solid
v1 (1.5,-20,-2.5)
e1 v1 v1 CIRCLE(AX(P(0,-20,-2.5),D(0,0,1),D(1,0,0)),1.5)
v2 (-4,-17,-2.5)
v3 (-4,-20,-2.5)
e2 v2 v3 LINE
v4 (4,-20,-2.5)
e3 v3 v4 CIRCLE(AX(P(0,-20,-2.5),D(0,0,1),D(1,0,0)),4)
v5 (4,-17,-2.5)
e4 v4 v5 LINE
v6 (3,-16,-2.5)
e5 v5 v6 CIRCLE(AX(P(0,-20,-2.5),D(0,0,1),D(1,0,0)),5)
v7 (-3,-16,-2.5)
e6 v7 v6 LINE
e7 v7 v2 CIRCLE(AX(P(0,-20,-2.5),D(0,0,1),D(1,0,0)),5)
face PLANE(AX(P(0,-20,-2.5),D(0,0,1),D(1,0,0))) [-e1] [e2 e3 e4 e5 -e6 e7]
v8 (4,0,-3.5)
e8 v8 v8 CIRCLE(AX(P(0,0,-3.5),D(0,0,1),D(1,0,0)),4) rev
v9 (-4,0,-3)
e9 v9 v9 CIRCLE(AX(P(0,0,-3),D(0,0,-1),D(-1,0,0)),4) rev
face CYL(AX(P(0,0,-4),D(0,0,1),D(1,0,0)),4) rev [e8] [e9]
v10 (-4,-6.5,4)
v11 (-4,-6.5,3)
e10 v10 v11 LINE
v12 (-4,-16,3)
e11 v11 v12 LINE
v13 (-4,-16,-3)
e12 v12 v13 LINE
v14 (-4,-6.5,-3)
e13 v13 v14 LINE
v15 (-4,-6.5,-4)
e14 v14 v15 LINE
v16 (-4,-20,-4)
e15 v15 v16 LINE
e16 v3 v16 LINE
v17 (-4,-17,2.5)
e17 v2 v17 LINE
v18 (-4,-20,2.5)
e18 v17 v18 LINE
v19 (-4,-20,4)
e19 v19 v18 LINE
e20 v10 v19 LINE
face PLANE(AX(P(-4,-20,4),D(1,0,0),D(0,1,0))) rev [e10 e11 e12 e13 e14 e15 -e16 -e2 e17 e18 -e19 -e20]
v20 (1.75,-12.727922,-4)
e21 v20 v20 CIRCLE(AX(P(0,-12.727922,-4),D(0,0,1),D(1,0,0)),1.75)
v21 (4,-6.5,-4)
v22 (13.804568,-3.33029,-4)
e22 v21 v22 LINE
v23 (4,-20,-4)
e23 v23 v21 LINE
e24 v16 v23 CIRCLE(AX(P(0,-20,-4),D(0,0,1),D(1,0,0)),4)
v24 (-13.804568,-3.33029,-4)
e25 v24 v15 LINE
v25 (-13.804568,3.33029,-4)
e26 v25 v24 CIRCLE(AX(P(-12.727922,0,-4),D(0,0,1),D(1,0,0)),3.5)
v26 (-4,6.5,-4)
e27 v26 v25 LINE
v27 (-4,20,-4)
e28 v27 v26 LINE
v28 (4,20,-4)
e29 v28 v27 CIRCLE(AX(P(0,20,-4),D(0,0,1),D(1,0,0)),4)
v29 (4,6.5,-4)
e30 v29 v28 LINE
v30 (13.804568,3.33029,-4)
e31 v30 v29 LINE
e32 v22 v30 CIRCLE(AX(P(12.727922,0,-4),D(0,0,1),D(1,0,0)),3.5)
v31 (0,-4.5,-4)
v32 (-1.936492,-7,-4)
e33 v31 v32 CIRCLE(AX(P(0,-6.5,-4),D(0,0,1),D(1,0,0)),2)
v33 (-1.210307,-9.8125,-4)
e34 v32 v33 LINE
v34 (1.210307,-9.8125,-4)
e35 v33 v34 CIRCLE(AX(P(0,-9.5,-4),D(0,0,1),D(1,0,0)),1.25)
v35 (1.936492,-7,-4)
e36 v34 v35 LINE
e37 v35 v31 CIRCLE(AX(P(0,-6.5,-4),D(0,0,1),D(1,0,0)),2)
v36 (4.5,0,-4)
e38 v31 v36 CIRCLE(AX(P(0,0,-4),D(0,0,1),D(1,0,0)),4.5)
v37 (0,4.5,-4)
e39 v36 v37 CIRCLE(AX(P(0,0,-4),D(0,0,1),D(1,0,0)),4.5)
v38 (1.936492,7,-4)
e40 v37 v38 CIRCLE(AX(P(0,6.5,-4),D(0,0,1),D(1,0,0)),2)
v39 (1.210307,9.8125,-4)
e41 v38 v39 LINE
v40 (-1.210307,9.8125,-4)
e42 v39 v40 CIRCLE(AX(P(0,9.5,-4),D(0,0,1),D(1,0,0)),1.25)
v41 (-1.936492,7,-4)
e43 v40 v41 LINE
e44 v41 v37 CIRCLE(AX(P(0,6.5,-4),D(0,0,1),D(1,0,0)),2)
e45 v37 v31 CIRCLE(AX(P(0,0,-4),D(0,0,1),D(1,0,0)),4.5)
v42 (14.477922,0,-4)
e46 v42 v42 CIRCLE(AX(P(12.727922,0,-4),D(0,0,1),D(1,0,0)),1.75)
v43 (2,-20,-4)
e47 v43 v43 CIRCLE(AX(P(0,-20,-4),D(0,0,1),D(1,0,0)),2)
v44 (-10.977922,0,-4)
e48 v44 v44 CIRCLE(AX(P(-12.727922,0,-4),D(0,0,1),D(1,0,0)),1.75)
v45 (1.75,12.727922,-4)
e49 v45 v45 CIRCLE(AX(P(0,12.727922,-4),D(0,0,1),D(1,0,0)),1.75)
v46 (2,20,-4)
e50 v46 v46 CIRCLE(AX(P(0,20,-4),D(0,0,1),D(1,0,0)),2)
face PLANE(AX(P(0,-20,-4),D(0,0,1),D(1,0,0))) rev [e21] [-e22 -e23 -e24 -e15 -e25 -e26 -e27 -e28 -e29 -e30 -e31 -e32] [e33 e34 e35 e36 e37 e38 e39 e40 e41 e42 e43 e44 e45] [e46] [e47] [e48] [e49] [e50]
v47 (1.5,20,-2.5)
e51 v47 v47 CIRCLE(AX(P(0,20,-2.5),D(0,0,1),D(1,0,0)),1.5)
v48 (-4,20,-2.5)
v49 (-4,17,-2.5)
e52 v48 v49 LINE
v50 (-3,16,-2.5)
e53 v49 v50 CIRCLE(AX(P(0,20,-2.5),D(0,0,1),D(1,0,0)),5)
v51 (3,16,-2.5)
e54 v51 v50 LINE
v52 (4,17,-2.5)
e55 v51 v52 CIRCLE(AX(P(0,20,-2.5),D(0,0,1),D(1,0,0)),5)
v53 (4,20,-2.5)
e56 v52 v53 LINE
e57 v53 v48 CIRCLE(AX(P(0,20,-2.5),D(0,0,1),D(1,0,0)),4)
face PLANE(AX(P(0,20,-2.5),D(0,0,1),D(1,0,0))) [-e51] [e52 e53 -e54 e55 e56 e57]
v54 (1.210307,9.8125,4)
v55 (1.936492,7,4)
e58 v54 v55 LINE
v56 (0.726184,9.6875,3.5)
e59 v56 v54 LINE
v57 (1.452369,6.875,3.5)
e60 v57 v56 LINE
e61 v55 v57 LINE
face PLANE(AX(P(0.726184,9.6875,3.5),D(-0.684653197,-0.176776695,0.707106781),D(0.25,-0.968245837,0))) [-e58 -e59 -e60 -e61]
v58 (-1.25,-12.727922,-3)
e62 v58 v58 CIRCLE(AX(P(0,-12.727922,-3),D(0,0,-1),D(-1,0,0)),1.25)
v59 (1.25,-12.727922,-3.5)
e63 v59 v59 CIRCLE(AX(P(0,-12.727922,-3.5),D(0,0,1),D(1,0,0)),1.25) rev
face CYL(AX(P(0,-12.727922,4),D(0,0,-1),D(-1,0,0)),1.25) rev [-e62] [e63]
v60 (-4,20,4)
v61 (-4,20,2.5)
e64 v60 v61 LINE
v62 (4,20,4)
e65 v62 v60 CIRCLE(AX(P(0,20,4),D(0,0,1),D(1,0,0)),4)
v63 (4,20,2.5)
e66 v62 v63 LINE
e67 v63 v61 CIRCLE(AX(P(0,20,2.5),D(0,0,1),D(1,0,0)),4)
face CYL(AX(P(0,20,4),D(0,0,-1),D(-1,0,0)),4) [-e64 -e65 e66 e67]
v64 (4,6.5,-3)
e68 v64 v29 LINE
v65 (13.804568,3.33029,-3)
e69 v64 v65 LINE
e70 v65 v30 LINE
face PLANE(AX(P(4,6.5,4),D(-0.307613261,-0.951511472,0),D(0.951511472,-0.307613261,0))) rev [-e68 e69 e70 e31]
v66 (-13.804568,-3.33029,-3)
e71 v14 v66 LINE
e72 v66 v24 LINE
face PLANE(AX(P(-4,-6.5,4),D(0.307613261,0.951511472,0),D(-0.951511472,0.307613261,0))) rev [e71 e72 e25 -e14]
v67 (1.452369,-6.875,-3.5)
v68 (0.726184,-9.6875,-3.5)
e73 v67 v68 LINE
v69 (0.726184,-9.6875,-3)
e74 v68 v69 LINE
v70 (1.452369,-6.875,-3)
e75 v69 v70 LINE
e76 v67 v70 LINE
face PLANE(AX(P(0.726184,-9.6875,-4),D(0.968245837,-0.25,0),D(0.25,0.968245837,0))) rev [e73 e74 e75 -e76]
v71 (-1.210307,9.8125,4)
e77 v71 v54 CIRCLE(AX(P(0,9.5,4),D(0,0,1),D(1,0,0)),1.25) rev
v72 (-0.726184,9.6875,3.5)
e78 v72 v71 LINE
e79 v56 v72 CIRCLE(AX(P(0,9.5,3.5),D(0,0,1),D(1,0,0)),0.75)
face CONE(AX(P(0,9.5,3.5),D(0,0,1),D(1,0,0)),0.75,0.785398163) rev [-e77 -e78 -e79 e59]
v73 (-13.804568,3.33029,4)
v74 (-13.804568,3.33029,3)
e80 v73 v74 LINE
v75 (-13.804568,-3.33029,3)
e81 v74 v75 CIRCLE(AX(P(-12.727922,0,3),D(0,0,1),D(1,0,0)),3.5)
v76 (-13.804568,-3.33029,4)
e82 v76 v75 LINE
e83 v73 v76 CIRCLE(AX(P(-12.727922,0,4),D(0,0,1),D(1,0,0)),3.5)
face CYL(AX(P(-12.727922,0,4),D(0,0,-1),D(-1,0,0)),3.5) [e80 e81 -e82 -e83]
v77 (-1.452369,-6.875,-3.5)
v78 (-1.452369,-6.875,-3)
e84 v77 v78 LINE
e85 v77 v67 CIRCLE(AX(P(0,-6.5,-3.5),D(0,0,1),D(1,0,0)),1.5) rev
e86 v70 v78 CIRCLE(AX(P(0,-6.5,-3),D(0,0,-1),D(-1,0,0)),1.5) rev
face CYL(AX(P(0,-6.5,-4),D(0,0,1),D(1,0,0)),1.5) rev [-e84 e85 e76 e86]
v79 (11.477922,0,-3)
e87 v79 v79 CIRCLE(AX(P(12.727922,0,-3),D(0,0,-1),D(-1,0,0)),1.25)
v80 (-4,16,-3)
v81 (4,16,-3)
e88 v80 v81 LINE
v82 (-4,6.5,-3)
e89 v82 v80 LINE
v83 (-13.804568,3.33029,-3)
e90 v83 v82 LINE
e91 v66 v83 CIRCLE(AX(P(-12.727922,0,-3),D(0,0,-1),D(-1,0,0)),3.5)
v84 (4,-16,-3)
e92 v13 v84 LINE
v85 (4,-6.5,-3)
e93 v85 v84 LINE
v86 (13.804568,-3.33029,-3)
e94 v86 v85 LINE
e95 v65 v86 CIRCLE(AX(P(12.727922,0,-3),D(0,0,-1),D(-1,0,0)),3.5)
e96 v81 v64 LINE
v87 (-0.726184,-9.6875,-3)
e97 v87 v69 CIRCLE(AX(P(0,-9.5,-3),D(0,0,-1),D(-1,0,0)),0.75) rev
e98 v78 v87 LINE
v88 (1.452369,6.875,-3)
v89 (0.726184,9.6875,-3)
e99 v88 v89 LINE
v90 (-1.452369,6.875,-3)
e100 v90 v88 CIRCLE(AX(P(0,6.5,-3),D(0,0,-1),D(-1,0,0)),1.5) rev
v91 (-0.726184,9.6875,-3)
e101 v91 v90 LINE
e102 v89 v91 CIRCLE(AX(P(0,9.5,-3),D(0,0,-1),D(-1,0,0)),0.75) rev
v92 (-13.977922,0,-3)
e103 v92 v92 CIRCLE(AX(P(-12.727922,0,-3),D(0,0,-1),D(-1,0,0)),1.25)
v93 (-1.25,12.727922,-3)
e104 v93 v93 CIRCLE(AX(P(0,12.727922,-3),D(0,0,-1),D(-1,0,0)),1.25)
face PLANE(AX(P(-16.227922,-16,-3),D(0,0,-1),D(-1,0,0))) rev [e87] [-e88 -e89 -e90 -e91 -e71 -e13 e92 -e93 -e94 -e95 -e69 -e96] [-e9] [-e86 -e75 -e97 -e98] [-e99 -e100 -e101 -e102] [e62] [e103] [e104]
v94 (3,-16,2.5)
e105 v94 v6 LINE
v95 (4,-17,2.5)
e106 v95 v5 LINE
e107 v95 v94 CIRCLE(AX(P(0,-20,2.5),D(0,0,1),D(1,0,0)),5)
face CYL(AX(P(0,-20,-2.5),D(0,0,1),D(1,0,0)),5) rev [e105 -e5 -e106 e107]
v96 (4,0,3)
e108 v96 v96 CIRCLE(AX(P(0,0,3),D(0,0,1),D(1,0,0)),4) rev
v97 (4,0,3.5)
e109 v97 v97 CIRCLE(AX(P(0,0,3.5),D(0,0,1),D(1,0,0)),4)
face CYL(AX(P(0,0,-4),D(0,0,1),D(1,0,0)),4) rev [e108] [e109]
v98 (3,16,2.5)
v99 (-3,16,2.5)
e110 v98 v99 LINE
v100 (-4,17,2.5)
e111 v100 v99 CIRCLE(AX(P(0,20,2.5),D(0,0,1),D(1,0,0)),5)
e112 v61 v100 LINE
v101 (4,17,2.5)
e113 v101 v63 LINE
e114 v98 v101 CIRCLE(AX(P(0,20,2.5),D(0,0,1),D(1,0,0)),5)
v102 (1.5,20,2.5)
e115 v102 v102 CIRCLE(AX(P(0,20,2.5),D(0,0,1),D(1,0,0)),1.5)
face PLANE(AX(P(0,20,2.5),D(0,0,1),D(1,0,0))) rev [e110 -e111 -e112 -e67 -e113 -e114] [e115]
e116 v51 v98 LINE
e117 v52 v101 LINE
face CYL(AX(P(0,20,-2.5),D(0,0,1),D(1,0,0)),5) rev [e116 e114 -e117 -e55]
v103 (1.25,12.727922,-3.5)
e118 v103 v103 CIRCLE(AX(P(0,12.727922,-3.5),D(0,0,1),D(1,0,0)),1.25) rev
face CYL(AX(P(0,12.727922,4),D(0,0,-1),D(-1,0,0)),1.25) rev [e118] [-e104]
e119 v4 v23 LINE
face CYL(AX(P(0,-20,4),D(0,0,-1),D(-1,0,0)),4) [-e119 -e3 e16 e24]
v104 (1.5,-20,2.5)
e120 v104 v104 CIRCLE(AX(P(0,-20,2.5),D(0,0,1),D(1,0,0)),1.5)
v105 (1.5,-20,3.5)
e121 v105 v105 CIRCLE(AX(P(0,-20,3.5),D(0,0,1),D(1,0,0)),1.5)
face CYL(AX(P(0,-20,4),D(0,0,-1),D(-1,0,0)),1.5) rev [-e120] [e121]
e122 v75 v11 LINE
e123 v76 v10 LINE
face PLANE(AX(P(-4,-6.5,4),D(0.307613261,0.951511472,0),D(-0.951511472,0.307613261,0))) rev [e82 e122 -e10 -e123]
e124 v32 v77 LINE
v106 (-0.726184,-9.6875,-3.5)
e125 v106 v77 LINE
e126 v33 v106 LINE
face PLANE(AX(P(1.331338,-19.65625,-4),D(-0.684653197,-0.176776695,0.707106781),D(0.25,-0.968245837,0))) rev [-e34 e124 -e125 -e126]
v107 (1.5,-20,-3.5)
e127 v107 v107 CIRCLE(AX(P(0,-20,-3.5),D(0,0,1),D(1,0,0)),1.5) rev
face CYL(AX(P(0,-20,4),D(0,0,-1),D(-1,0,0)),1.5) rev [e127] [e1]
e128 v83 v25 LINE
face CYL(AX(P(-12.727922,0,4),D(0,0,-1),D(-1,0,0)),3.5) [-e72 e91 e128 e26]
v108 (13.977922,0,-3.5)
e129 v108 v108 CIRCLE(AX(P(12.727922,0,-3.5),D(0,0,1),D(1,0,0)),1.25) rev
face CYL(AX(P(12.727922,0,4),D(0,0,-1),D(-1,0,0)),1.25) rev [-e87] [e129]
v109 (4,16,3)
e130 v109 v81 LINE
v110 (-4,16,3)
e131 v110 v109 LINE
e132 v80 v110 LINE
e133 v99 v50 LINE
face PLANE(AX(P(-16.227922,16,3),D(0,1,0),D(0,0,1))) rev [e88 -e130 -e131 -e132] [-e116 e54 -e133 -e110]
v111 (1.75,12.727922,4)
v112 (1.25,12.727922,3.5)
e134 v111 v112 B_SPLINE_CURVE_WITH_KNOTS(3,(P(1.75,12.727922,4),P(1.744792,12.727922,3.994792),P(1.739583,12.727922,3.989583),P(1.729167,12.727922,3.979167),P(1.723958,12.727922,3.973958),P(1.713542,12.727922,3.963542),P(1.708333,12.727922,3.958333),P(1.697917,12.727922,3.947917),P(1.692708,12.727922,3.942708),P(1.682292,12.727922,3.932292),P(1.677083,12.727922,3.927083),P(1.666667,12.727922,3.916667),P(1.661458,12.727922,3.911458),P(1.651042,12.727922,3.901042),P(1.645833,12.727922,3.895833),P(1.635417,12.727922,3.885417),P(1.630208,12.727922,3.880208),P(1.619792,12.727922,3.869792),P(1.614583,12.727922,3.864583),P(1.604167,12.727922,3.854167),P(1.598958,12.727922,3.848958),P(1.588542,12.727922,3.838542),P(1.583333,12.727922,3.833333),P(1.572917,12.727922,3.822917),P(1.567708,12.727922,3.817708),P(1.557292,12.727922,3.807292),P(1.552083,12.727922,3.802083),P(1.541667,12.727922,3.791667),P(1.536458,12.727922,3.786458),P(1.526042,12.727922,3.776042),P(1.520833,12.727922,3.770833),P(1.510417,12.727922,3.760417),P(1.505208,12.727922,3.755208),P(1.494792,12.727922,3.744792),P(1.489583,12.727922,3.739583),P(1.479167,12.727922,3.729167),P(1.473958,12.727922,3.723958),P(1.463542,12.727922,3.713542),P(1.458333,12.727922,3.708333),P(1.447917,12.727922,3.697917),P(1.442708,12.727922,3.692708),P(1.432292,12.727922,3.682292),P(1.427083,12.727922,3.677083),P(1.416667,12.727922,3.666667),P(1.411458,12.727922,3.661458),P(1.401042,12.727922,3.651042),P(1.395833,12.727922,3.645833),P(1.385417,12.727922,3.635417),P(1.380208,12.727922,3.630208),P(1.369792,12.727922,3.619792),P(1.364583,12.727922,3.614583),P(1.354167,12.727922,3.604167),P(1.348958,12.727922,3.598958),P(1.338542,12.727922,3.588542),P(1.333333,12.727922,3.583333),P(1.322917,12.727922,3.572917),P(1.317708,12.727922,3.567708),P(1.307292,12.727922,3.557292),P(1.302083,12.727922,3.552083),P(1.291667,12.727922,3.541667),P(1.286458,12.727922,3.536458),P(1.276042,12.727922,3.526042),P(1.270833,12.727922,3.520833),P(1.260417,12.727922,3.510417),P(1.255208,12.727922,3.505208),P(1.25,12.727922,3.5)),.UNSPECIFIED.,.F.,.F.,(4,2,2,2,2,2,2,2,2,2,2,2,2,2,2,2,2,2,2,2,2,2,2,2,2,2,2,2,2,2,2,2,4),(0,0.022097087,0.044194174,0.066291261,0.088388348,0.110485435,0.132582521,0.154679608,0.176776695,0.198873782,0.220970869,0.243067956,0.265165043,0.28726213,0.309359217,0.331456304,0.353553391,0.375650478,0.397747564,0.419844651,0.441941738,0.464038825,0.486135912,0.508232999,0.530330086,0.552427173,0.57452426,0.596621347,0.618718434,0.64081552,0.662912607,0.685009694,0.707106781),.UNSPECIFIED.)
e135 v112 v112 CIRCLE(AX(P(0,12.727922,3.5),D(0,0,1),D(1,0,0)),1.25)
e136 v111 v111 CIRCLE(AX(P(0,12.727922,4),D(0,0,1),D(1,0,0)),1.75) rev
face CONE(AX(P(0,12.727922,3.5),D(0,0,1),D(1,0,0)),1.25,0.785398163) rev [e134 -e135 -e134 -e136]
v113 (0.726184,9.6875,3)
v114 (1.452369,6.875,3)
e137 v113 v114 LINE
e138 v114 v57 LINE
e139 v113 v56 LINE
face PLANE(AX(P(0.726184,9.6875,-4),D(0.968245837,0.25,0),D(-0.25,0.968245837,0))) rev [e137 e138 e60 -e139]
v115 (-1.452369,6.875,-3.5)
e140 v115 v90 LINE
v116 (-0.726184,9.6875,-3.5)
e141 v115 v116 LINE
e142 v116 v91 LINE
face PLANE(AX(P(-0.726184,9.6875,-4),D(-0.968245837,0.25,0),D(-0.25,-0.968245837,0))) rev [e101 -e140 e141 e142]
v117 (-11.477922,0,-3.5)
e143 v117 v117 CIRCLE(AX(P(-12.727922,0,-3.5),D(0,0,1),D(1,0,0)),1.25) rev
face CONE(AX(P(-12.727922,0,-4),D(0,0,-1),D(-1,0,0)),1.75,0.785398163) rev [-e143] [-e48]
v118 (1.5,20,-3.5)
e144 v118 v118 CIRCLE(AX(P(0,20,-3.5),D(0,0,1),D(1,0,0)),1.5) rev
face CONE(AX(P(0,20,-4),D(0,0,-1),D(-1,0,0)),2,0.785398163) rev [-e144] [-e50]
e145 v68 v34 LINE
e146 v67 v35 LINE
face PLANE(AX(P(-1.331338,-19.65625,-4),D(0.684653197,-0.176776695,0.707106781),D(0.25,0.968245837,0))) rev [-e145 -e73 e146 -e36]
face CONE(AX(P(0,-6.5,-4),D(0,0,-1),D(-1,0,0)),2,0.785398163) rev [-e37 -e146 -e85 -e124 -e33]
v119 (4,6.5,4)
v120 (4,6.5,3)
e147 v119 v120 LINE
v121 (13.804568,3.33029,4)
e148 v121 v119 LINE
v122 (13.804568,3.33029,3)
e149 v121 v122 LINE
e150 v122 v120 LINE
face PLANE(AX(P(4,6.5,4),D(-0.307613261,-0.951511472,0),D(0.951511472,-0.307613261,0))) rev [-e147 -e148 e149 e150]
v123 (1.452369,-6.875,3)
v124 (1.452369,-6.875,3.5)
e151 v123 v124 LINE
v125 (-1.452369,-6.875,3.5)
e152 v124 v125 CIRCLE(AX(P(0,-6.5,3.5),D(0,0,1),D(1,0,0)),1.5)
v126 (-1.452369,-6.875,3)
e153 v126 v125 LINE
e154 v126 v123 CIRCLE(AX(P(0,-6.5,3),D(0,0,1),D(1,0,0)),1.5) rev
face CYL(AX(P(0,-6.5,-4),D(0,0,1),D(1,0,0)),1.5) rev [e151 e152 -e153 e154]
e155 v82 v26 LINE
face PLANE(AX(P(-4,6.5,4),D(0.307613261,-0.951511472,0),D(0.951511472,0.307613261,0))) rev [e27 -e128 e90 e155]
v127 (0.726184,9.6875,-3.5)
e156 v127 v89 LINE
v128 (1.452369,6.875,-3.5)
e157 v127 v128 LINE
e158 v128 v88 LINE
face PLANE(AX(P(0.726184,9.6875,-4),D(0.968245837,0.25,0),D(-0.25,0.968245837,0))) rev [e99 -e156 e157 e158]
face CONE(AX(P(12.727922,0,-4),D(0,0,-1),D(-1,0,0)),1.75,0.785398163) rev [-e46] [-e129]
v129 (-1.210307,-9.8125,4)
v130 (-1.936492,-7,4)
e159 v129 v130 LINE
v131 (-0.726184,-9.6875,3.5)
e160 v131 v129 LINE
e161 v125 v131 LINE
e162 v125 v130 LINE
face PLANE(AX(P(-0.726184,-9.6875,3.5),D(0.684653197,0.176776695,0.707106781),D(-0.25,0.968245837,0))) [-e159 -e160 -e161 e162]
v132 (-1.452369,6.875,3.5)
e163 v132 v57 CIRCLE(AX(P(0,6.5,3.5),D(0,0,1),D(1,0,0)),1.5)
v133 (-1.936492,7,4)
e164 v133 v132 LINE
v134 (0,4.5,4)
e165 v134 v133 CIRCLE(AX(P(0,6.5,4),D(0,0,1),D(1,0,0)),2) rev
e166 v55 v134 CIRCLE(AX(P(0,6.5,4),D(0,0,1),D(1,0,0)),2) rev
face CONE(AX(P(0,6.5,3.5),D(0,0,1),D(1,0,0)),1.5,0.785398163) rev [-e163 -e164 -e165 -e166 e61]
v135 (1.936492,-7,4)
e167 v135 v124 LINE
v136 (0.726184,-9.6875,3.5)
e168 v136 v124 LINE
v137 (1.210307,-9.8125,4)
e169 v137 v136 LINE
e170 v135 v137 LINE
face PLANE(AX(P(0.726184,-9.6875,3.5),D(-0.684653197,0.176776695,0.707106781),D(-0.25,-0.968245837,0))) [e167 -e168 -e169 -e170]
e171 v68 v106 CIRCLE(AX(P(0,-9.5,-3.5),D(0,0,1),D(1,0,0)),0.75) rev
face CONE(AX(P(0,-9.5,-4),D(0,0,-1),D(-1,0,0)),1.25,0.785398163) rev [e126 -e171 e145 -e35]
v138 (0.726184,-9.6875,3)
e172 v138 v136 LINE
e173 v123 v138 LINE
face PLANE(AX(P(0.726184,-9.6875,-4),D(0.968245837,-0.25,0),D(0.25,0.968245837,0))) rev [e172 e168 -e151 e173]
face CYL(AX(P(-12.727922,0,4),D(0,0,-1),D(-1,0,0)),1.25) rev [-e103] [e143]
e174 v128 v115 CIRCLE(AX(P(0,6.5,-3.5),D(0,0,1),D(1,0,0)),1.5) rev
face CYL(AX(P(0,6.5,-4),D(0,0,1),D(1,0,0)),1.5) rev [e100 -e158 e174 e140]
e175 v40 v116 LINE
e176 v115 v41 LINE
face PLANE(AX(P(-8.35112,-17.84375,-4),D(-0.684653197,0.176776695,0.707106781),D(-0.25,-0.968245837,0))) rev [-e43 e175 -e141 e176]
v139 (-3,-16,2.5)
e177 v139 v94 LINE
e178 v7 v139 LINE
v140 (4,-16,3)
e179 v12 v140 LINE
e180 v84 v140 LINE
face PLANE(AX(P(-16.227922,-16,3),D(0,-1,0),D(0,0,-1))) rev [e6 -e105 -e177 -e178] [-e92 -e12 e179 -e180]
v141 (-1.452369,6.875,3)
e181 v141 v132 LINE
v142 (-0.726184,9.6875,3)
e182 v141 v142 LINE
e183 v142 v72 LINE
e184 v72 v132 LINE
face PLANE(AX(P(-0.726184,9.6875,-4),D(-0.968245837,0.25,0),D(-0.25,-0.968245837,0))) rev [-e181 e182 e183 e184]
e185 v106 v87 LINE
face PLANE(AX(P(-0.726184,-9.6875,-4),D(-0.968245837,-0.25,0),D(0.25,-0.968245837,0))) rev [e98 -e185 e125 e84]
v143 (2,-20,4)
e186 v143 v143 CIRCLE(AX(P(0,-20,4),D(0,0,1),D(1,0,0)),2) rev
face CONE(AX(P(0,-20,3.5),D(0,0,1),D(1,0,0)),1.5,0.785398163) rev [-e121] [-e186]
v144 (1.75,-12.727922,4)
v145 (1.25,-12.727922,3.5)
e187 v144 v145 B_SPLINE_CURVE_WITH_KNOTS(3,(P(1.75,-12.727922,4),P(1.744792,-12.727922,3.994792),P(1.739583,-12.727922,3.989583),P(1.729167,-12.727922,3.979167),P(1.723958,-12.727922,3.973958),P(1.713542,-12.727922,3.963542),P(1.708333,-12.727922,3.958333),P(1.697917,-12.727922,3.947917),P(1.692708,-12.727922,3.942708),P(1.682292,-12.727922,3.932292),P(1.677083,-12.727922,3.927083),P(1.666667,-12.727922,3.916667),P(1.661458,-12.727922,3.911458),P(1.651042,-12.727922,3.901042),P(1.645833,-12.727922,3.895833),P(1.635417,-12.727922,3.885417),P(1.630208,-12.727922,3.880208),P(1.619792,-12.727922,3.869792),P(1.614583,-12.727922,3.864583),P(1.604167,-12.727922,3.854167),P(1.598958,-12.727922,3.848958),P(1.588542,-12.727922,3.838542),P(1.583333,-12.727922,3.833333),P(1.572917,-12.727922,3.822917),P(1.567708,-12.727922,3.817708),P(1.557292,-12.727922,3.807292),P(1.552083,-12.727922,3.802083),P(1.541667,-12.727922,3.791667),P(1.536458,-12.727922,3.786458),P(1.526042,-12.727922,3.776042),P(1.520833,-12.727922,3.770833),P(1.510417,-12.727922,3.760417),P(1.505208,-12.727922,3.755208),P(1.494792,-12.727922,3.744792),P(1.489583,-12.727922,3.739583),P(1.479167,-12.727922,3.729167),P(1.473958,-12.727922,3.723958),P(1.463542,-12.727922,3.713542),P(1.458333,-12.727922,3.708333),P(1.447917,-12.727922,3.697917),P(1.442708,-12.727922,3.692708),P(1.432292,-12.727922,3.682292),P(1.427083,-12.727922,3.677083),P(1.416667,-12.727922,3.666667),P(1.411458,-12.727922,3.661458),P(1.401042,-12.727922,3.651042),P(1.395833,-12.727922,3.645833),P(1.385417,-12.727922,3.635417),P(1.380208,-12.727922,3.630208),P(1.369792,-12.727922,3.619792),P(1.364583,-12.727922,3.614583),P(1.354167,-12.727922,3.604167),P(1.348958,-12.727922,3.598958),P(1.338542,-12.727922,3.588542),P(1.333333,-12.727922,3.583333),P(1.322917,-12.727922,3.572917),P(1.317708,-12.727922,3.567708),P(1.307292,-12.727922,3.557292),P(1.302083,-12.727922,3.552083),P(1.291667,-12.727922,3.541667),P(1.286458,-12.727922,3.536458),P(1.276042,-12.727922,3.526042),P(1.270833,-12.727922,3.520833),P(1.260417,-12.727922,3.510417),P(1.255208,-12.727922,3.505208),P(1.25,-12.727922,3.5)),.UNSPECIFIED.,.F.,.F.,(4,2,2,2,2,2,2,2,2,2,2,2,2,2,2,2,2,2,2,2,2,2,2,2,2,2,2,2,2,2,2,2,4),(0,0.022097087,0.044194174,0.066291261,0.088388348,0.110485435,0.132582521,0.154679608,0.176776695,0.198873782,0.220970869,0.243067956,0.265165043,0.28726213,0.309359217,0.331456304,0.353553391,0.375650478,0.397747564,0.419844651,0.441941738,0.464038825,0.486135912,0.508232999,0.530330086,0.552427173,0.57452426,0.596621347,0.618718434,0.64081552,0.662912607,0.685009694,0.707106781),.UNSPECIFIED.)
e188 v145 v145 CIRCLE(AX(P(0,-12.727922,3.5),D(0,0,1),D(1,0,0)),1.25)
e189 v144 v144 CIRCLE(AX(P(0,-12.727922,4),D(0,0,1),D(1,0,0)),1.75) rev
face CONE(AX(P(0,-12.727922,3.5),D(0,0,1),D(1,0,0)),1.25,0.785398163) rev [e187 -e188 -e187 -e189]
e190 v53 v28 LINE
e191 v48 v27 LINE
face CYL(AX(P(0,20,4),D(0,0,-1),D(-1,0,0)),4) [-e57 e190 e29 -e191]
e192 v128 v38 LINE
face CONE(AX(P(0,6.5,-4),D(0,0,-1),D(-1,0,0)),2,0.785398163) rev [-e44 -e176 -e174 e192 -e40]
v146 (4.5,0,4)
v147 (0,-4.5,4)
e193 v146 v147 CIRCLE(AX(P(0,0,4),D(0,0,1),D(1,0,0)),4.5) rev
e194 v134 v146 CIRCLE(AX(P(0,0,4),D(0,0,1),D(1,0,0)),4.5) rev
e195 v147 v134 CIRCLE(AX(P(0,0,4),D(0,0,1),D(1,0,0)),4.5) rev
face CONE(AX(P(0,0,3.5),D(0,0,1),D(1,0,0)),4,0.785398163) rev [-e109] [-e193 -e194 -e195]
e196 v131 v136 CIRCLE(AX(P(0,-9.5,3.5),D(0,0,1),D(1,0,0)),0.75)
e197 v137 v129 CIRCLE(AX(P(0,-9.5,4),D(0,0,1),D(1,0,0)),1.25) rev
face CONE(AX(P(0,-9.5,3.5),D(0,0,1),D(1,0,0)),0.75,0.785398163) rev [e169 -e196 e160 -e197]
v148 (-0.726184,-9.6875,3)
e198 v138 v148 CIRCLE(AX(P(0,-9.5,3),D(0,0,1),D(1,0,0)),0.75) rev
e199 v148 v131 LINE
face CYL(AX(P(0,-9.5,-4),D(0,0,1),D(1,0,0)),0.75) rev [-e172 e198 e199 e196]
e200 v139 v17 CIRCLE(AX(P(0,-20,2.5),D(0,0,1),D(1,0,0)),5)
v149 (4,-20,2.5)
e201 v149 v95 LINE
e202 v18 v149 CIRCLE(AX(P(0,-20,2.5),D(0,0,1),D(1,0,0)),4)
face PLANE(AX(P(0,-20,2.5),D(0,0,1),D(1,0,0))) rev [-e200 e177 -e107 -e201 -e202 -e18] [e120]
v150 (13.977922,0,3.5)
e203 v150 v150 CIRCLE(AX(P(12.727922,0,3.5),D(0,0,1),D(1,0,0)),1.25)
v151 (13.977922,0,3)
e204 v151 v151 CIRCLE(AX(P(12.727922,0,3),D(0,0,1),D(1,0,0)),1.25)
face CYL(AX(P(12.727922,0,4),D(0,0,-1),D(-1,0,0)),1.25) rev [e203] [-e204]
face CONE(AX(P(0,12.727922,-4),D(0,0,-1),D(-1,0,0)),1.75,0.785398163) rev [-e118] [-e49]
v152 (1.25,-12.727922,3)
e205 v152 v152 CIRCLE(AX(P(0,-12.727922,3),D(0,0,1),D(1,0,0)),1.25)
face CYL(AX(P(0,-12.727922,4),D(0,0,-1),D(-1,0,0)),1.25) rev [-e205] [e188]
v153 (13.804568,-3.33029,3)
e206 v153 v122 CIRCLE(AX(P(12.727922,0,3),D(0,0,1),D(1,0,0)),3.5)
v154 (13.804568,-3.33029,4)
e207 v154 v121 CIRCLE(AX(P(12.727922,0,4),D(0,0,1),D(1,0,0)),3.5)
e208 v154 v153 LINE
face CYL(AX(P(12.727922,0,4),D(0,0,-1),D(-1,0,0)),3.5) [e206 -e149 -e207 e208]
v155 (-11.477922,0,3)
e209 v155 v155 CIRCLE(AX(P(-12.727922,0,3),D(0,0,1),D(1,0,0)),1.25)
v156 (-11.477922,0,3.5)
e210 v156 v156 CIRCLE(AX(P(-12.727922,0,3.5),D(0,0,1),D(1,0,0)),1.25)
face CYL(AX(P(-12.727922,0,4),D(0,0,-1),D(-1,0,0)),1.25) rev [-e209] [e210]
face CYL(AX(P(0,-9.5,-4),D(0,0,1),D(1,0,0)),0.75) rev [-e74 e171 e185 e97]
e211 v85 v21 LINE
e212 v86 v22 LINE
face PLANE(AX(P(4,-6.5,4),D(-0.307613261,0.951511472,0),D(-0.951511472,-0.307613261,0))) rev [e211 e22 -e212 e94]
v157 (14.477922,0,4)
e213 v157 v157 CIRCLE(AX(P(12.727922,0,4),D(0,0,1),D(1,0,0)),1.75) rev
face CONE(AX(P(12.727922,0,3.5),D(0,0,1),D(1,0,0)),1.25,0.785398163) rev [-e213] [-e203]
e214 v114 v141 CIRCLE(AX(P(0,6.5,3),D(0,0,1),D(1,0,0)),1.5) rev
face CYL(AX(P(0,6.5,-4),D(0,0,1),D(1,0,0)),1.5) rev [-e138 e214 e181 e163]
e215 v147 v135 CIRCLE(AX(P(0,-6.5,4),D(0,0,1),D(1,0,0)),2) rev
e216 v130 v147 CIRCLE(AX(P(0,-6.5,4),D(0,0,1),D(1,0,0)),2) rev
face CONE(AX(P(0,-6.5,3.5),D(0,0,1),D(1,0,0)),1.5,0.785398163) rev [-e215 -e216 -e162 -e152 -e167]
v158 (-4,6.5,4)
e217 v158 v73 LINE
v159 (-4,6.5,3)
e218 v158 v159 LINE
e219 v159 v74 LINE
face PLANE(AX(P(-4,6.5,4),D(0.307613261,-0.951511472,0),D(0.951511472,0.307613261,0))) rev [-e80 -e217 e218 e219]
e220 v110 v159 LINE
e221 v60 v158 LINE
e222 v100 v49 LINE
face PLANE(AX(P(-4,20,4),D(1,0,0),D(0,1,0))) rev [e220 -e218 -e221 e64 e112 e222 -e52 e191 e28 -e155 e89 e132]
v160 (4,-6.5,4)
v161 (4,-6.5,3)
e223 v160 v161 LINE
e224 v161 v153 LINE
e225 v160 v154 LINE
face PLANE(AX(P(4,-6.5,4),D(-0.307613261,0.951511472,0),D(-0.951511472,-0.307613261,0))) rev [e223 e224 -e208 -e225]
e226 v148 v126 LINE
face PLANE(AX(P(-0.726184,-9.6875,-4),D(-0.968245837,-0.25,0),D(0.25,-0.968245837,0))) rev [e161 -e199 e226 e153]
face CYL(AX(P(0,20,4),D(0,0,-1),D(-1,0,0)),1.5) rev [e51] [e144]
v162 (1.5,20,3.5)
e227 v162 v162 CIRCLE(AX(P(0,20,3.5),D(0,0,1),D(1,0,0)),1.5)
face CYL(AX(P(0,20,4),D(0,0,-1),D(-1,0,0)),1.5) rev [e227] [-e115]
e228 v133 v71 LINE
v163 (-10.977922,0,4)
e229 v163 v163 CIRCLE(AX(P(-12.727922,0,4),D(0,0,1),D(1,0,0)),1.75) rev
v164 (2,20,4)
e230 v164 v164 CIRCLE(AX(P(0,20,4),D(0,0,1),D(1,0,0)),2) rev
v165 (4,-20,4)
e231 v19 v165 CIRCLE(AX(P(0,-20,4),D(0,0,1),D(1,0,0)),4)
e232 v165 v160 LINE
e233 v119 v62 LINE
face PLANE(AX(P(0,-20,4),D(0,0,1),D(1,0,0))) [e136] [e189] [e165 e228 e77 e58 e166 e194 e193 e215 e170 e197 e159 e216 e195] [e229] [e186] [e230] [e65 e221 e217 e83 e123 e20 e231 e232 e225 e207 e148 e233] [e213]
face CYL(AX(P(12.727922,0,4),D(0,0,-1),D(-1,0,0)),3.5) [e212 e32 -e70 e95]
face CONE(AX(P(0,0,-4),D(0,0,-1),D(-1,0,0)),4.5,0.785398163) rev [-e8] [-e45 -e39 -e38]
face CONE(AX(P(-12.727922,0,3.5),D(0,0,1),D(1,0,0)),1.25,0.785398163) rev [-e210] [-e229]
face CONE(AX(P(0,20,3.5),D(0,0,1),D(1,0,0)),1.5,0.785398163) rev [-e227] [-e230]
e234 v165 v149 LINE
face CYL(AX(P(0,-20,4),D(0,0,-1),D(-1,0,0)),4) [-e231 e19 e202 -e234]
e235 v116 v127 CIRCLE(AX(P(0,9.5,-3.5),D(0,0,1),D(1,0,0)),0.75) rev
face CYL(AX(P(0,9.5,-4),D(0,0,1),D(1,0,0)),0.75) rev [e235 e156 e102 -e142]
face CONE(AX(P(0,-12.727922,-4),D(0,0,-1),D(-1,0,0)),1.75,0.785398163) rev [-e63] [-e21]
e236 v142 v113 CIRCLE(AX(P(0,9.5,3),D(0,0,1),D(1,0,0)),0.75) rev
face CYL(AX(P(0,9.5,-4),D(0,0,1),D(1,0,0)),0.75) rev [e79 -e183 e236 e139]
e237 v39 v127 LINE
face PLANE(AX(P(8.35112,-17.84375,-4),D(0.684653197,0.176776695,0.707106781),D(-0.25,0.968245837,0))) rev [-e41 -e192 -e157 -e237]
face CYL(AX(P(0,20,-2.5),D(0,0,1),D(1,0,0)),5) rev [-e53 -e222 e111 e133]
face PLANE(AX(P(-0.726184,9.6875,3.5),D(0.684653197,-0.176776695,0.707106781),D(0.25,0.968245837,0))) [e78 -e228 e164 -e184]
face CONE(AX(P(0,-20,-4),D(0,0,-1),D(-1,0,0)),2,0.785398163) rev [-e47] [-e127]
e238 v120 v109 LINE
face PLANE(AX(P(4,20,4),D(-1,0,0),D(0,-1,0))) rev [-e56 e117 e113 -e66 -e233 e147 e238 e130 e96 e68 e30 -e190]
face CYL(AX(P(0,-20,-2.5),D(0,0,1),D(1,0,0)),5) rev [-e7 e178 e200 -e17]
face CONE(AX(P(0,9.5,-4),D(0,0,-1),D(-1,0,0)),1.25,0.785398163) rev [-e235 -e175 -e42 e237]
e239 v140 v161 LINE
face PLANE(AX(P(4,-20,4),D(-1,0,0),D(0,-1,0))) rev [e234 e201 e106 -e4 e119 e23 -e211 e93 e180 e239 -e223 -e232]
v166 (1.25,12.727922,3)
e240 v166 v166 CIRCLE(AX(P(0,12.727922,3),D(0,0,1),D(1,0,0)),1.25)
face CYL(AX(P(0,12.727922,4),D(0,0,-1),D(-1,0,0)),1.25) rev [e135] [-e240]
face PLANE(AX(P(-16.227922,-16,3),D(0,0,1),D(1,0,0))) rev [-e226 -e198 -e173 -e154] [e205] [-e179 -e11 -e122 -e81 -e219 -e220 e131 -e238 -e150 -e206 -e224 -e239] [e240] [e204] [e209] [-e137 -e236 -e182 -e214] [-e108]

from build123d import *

# Parameters (mm, degrees)
SKETCH_1_R               = 1.25
SKETCH_1_R_2             = 1.5
EXTRUDE_1_DEPTH          = 4
SKETCH_2_R               = 4
CUT_EXTRUDE_1_DEPTH      = 31.055705855
CHAMFER_1_SIZE           = 0.5
SKETCH_3_R               = 5
CUT_EXTRUDE_2_DEPTH      = 2.5
CUT_EXTRUDE_4_DEPTH      = 30.246289584
CUT_EXTRUDE_4_DEPTH_BACK = 30.246289584
SKETCH_7_W               = 6
SKETCH_7_H               = 32


with BuildPart() as part:
    # 草图1 → 凸台-拉伸1 (new, symmetric)
    with BuildSketch(Plane.XY):
        with BuildLine():
            Line((-4, 20), (-4, 6.5))
            Line((-4, 6.5), (-13.804568476, 3.330290152))
            ThreePointArc((-13.804568476, 3.330290152), (-16.227922061, 0), (-13.804568476, -3.330290152))
            Line((-13.804568476, -3.330290152), (-4, -6.5))
            Line((-4, -6.5), (-4, -20))
            ThreePointArc((-4, -20), (0, -24), (4, -20))
            Line((4, -20), (4, -6.5))
            Line((4, -6.5), (13.804568476, -3.330290152))
            ThreePointArc((13.804568476, -3.330290152), (16.227922061, 0), (13.804568476, 3.330290152))
            Line((13.804568476, 3.330290152), (4, 6.5))
            Line((4, 6.5), (4, 20))
            ThreePointArc((4, 20), (0, 24), (-4, 20))
        make_face()
        with Locations((0, 12.727922061)):
            Circle(SKETCH_1_R, mode=Mode.SUBTRACT)
        with Locations((0, -12.727922061)):
            Circle(SKETCH_1_R, mode=Mode.SUBTRACT)
        with Locations((-12.727922061, 0)):
            Circle(SKETCH_1_R, mode=Mode.SUBTRACT)
        with Locations((12.727922061, 0)):
            Circle(SKETCH_1_R, mode=Mode.SUBTRACT)
        with Locations((0, 20)):
            Circle(SKETCH_1_R_2, mode=Mode.SUBTRACT)
        with Locations((0, -20)):
            Circle(SKETCH_1_R_2, mode=Mode.SUBTRACT)
    extrude(amount=EXTRUDE_1_DEPTH, both=True)

    # 草图2 → 切除-拉伸1 (cut, through all)
    with BuildSketch(Plane.XY.offset(4)):
        Circle(SKETCH_2_R)
        with BuildLine():
            Line((-0.726184377, 9.6875), (-1.452368755, 6.875))
            ThreePointArc((-1.452368755, 6.875), (0, 5), (1.452368755, 6.875))
            Line((1.452368755, 6.875), (0.726184377, 9.6875))
            ThreePointArc((0.726184377, 9.6875), (0, 10.25), (-0.726184377, 9.6875))
        make_face()
        with BuildLine():
            Line((-0.726184377, -9.6875), (-1.452368755, -6.875))
            ThreePointArc((-1.452368755, -6.875), (0, -5), (1.452368755, -6.875))
            Line((1.452368755, -6.875), (0.726184377, -9.6875))
            ThreePointArc((0.726184377, -9.6875), (0, -10.25), (-0.726184377, -9.6875))
        make_face()
    extrude(amount=-CUT_EXTRUDE_1_DEPTH, mode=Mode.SUBTRACT)

    # 倒角1
    chamfer_1_edges = [part.edges().sort_by_distance(p)[0] for p in [
        (-1.25, 12.727922061, -4),
        (-1.25, 12.727922061, 4),
        (-1.25, -12.727922061, -4),
        (-1.25, -12.727922061, 4),
        (-1.5, 20, -4),
        (-1.5, 20, 4),
        (11.477922061, 0, -4),
        (11.477922061, 0, 4),
        (-13.977922061, 0, -4),
        (-13.977922061, 0, 4),
        (-1.5, -20, -4),
        (-1.5, -20, 4),
        (0, 10.25, -4),
        (1.089276566, 8.28125, -4),
        (0, 5, -4),
        (-1.089276566, 8.28125, -4),
        (0, 10.25, 4),
        (-1.089276566, 8.28125, 4),
        (0, 5, 4),
        (1.089276566, 8.28125, 4),
        (0, -5, -4),
        (1.089276566, -8.28125, -4),
        (0, -10.25, -4),
        (-1.089276566, -8.28125, -4),
        (0, -5, 4),
        (-1.089276566, -8.28125, 4),
        (0, -10.25, 4),
        (1.089276566, -8.28125, 4),
        (-4, 0, -4),
        (-4, 0, 4),
    ]]
    chamfer(chamfer_1_edges, length=CHAMFER_1_SIZE - 0.0001)  # a hair under: the kernel refuses the full size

    # 草图3 → 切除-拉伸2 (cut, symmetric)
    with BuildSketch(Plane.XY):
        with Locations((0, 20)):
            Circle(SKETCH_3_R)
        with Locations((0, -20)):
            Circle(SKETCH_3_R)
    extrude(amount=CUT_EXTRUDE_2_DEPTH, both=True, mode=Mode.SUBTRACT)

    # 草图7 → 切除-拉伸4 (cut, two sides: drawn at the far end of the back side and taken through both)
    with BuildSketch(Plane(origin=(0, 0, 0), x_dir=(0, 0, -1), z_dir=(1, 0, 0)).offset(-CUT_EXTRUDE_4_DEPTH_BACK)):
        Rectangle(SKETCH_7_W, SKETCH_7_H)
    extrude(amount=CUT_EXTRUDE_4_DEPTH + CUT_EXTRUDE_4_DEPTH_BACK, mode=Mode.SUBTRACT)


solid = part.part
